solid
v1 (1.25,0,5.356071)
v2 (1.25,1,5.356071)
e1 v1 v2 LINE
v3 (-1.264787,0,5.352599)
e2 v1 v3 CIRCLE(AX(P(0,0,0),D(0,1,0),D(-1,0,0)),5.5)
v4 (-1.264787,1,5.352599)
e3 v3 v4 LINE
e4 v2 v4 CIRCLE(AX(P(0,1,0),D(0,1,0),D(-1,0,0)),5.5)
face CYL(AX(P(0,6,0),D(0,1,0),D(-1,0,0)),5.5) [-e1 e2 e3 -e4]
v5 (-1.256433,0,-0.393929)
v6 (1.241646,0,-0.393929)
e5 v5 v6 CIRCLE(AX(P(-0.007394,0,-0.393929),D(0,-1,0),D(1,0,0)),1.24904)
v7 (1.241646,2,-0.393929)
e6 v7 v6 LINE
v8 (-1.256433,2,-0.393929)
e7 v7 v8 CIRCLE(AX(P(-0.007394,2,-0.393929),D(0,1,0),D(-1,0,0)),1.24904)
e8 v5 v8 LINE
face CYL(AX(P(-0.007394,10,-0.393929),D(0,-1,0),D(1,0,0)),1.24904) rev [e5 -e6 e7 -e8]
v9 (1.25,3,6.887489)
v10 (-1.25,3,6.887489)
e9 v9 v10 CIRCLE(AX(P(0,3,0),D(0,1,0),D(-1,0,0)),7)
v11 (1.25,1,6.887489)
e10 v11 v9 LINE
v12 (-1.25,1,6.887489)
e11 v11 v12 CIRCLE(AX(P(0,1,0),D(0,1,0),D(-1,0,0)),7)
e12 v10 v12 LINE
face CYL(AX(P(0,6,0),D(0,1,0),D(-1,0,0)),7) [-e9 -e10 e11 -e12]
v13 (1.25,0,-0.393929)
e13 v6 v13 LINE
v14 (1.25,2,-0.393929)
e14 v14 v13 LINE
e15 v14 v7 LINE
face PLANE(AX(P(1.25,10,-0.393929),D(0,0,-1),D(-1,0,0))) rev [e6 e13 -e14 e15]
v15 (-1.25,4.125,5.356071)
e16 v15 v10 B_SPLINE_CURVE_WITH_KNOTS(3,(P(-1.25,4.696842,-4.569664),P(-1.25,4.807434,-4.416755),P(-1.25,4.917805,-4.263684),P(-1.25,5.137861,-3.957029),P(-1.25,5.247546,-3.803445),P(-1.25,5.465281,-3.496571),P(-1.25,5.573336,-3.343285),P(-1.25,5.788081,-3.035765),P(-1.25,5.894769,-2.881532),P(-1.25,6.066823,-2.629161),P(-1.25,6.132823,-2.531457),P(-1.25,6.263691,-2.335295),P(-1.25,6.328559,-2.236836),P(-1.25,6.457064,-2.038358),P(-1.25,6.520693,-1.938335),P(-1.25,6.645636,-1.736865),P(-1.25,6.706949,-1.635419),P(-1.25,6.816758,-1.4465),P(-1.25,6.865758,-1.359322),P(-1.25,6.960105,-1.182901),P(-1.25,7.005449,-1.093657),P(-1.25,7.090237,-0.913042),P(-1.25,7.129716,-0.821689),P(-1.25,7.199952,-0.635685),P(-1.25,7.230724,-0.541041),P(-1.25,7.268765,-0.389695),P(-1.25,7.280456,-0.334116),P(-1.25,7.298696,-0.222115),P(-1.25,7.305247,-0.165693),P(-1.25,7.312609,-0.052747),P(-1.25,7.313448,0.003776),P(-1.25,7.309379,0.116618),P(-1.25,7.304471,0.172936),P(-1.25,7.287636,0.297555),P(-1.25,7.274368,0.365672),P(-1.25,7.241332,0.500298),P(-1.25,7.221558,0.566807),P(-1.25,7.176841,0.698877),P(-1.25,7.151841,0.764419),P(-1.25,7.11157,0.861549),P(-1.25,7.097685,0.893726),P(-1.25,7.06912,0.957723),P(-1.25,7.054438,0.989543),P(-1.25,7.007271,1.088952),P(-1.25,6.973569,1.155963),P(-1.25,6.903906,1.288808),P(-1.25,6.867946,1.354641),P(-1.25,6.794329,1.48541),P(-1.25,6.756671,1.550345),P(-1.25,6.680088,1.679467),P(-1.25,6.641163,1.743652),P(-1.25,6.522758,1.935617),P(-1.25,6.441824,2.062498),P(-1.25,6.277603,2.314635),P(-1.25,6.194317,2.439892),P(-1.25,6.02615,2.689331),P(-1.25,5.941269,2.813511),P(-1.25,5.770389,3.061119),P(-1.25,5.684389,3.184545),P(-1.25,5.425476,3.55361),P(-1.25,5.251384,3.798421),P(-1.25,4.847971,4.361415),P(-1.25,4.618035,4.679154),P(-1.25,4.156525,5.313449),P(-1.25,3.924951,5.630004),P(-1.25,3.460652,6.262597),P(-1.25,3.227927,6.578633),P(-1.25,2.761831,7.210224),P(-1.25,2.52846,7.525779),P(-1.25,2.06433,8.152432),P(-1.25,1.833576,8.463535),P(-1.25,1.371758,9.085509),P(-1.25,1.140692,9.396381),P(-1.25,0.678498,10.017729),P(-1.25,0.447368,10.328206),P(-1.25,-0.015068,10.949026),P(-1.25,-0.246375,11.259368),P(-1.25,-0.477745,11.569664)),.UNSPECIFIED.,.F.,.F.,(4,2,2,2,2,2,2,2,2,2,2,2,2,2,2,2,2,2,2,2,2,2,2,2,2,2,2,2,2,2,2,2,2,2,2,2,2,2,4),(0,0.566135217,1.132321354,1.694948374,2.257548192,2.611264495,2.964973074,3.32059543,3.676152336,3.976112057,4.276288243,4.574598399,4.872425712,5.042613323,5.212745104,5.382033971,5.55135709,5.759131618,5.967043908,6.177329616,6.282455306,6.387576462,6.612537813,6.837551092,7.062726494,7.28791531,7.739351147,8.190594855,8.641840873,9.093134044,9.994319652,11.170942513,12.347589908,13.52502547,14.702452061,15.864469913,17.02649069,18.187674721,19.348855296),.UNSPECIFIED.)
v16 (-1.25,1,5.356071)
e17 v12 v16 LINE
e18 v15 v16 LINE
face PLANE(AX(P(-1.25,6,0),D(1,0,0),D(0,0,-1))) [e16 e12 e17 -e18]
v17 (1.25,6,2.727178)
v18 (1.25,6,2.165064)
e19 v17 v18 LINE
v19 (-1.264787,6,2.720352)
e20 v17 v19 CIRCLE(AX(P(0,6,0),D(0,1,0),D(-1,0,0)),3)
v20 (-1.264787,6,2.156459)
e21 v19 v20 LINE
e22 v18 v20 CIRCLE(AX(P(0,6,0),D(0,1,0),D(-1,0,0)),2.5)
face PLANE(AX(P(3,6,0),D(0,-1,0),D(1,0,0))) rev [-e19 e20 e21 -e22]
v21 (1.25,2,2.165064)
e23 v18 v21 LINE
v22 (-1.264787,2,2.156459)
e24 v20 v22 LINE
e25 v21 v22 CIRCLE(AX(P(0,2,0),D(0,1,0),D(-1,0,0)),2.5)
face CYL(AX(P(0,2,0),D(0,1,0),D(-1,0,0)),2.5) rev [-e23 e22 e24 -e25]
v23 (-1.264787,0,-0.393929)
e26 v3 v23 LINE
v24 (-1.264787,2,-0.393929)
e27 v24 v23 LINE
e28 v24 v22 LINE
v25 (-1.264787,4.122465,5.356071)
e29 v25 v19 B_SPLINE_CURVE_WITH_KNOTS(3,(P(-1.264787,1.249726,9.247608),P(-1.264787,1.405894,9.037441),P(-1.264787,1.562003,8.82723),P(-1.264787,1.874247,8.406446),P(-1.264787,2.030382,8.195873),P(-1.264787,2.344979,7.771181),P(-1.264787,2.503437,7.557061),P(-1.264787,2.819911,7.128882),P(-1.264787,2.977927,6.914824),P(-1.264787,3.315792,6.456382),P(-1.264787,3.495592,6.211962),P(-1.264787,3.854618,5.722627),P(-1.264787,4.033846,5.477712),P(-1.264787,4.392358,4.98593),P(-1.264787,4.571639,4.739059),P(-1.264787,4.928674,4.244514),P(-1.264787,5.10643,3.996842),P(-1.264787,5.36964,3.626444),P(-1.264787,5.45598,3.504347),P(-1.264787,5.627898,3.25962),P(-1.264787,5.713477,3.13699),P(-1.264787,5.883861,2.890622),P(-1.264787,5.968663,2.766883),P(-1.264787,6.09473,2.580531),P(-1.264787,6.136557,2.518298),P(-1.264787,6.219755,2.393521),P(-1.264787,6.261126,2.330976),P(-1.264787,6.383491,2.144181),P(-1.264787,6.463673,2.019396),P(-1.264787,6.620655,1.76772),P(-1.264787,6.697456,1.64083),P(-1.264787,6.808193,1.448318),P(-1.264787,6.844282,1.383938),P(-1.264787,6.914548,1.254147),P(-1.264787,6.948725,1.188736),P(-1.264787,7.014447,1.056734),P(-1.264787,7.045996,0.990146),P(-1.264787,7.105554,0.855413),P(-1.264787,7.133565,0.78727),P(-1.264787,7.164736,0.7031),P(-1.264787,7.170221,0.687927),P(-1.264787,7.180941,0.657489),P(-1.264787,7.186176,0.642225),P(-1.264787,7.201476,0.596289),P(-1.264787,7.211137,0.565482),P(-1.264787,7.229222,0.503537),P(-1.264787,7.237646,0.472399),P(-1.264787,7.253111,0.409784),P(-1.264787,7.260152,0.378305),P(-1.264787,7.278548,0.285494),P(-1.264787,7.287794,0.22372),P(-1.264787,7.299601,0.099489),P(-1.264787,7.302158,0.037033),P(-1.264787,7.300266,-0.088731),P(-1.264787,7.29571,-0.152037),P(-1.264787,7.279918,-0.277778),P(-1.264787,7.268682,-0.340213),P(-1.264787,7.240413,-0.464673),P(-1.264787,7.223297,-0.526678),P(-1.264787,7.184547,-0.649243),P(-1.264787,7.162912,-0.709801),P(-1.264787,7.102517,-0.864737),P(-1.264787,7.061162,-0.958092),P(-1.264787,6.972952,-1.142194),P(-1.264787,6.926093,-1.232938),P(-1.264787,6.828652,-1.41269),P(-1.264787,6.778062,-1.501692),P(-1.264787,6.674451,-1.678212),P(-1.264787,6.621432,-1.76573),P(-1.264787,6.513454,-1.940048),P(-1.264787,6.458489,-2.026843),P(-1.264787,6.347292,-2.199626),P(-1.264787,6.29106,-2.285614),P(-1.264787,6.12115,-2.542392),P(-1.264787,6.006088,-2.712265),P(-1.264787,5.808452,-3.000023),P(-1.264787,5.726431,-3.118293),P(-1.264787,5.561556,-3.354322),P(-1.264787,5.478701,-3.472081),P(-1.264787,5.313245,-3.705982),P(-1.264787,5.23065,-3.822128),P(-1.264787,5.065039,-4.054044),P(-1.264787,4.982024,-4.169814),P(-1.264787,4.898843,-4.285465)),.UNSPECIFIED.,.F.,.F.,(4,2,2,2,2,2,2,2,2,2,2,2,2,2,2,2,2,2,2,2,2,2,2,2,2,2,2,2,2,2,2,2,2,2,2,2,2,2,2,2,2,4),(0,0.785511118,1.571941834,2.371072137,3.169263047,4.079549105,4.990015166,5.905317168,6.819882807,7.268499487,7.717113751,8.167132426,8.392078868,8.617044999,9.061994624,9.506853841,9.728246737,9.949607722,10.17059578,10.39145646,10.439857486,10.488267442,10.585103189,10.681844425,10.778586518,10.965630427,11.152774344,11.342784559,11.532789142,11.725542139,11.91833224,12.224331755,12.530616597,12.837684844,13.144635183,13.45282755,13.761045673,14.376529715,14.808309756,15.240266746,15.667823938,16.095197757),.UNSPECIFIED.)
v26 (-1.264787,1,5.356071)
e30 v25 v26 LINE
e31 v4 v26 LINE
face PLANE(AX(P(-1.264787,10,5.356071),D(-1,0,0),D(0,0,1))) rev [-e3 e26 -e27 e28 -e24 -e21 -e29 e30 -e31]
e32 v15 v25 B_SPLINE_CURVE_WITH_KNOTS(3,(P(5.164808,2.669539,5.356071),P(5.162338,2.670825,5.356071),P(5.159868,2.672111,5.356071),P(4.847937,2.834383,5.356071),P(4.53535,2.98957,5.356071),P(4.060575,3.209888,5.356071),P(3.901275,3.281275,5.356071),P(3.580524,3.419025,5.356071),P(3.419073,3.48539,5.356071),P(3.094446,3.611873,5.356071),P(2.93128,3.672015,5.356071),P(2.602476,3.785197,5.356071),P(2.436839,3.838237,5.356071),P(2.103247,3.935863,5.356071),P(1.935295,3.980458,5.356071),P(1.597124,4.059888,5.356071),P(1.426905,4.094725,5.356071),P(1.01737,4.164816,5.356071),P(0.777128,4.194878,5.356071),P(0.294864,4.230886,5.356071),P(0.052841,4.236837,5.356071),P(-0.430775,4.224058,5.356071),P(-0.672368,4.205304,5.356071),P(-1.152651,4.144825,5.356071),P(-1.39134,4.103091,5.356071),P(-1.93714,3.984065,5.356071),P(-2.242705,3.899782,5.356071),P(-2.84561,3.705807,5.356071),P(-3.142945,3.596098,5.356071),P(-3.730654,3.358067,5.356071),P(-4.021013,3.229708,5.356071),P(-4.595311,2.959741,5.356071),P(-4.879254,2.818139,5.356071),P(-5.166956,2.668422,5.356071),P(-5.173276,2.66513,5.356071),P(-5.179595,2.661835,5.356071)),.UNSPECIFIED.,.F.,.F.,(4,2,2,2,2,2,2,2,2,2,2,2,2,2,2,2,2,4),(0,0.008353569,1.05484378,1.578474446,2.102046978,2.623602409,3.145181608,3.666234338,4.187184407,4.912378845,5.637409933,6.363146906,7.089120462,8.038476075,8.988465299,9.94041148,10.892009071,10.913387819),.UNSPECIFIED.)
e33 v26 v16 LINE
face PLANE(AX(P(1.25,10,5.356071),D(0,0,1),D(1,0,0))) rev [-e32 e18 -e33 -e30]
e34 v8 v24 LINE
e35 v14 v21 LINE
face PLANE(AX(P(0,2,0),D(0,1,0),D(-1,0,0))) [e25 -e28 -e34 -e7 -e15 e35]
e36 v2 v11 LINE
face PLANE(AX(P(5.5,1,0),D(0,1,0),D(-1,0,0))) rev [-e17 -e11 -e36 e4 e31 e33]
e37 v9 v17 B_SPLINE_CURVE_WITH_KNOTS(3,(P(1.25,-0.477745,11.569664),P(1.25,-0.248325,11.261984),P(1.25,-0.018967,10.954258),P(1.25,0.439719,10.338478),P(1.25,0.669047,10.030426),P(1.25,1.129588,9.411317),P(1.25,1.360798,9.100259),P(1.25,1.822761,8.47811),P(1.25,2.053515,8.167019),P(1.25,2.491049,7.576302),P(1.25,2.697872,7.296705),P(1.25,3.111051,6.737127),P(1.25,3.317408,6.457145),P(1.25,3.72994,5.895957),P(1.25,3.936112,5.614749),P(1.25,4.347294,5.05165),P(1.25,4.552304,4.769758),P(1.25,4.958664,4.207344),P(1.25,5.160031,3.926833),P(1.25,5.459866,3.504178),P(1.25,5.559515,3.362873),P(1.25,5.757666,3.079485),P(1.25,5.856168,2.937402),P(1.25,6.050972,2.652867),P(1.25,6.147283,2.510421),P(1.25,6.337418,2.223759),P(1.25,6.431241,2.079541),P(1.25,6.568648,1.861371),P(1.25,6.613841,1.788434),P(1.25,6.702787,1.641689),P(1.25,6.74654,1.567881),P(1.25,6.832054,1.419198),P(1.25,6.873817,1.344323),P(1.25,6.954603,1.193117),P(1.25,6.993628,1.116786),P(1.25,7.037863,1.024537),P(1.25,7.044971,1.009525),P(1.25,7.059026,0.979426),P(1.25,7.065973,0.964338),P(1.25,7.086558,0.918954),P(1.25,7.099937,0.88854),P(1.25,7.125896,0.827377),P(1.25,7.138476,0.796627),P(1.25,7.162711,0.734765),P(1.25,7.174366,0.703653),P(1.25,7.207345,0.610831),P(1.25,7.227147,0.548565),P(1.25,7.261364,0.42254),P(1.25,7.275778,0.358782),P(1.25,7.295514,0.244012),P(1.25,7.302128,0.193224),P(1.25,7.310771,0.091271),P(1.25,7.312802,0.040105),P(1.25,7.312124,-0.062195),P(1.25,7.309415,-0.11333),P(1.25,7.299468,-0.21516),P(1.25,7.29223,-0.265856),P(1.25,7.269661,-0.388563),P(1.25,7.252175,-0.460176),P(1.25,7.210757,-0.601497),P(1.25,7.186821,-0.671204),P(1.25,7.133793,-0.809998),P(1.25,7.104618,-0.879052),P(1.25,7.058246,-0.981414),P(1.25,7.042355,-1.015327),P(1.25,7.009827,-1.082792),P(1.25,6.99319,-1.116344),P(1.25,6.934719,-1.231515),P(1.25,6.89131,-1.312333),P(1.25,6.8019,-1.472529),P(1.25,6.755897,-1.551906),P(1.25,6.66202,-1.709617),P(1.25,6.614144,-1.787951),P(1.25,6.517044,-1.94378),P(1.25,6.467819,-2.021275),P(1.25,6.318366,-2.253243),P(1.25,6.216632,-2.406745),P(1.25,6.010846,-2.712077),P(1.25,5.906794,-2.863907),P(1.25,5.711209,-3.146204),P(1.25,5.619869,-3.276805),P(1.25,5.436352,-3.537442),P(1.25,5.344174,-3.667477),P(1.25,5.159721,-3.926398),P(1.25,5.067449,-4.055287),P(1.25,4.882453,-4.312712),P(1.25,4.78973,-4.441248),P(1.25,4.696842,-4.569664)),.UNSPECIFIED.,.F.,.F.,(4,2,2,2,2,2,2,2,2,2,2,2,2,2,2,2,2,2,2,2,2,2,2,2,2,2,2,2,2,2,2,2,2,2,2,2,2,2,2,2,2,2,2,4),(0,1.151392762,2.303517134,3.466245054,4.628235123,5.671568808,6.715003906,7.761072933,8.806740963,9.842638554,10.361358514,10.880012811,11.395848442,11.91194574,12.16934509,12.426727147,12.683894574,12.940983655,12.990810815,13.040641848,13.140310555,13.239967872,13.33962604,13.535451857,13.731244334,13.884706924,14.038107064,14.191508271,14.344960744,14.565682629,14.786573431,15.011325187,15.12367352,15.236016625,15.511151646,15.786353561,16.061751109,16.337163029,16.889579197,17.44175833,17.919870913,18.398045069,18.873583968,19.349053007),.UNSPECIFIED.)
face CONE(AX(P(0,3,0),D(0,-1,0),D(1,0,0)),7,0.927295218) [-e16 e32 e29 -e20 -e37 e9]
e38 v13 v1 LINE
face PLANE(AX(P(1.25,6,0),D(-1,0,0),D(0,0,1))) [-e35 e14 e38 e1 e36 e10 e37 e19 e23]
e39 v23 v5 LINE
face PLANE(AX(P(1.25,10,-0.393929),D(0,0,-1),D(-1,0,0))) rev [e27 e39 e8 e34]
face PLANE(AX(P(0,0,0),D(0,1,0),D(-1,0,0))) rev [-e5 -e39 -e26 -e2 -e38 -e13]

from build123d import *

# Parameters (mm, degrees)
SKETCH7_R               = 2.5
CUT_EXTRUDE2_DEPTH      = 4
CUT_EXTRUDE3_DEPTH      = 4
CUT_EXTRUDE3_DEPTH_BACK = 4
SKETCH8_W               = 2.5
SKETCH8_H               = 7.259020633
FILLET1_R               = 1.5
SKETCH9_W               = 2.5
SKETCH9_H               = 5.356071321
CUT_EXTRUDE4_DEPTH      = 10
FILLET2_R               = 1.25
SKETCH10_W              = 2.503236591
SKETCH10_H              = 5.356071321
CUT_EXTRUDE5_DEPTH      = 10
SKETCH11_W              = 2.503236591
SKETCH11_H              = 6.001405943
CUT_EXTRUDE6_DEPTH      = 10
FILLET4_R               = 1.25
SKETCH12_W              = 2.514787158
SKETCH12_H              = 5.75
CUT_EXTRUDE9_DEPTH      = 10
SKETCH14_R              = 1.249039751
CUT_EXTRUDE10_DEPTH     = 10


# Some blends are built 0.0001 mm under size
with BuildPart() as part:
    # Sketch5 → Revolve3 (revolve)
    with BuildSketch(Plane.XY, mode=Mode.PRIVATE) as revolve3_sk:
        Polygon((0, 0), (5.5, 0), (5.5, 1), (7, 1), (7, 3), (3, 6), (0, 6), align=None)
    revolve(revolve3_sk.sketch.rotate(Axis((0, 6, 0), (0, -1, 0)), 180), axis=Axis((0, 6, 0), (0, -1, 0)))

    # Sketch7 → Cut-Extrude2 (cut)
    with BuildSketch(Plane(origin=(0, 6, 0), x_dir=(1, 0, 0), z_dir=(0, 1, 0))):
        with Locations(Location((0, 0, 0), (0, 0, 180))):
            Circle(SKETCH7_R)
    extrude(amount=-CUT_EXTRUDE2_DEPTH, mode=Mode.SUBTRACT)

    # Sketch8 → Cut-Extrude3 (cut, two sides: drawn at the far end of the back side and taken through both)
    with BuildSketch(Plane(origin=(0, 2, 0), x_dir=(1, 0, 0), z_dir=(0, 1, 0)).offset(-CUT_EXTRUDE3_DEPTH_BACK)):
        with Locations((0, -3.629510317)):
            Rectangle(SKETCH8_W, SKETCH8_H)
    extrude(amount=CUT_EXTRUDE3_DEPTH + CUT_EXTRUDE3_DEPTH_BACK, mode=Mode.SUBTRACT)

    # Fillet1
    # the kernel refuses this fillet: 1.5 mm, written as the material it adds along each edge
    with BuildSketch(Plane(origin=(1.25, 2, 0), x_dir=(-1, 0, 0), z_dir=(0, -1, 0)), Plane(origin=(-1.25, 0, 0), x_dir=(1, 0, 0), z_dir=(0, 1, 0))) as fillet1_piece_1:
        with BuildLine():
            CenterArc((FILLET1_R, -FILLET1_R), FILLET1_R, 90, 90)
            Line((0, -FILLET1_R), (0, 0))
            Line((0, 0), (FILLET1_R, 0))
        make_face()
    extrude(amount=2)

    # Sketch9 → Cut-Extrude4 (cut)
    with BuildSketch(Plane(origin=(0, 0, 0), x_dir=(-1, 0, 0), z_dir=(0, -1, 0))):
        with Locations((0, -2.67803566)):
            Rectangle(SKETCH9_W, SKETCH9_H)
    extrude(amount=-CUT_EXTRUDE4_DEPTH, mode=Mode.SUBTRACT)

    # Fillet2
    fillet2_edges = [part.edges().sort_by_distance(p)[0] for p in [
        (-1.25, 1, 0),
        (1.25, 1, 0),
    ]]
    fillet(fillet2_edges, radius=FILLET2_R - 0.0001)  # a hair under: the kernel refuses the full size

    # Sketch10 → Cut-Extrude5 (cut)
    with BuildSketch(Plane.XZ):
        with Locations((-0.001618296, 2.67803566)):
            Rectangle(SKETCH10_W, SKETCH10_H)
    extrude(amount=-CUT_EXTRUDE5_DEPTH, mode=Mode.SUBTRACT)

    # Sketch11 → Cut-Extrude6 (cut)
    with BuildSketch(Plane(origin=(0, 0, 0), x_dir=(-1, 0, 0), z_dir=(0, -1, 0))):
        with Locations((0.001618296, -2.355368349)):
            Rectangle(SKETCH11_W, SKETCH11_H)
    extrude(amount=-CUT_EXTRUDE6_DEPTH, mode=Mode.SUBTRACT)

    # Fillet4
    fillet4_edges = [part.edges().sort_by_distance(p)[0] for p in [
        (1.25, 1, -0.645334622),
        (-1.253236591, 1, -0.645334622),
    ]]
    fillet(fillet4_edges, radius=FILLET4_R)

    # Sketch12 → Cut-Extrude9 (cut)
    with BuildSketch(Plane.XZ):
        with Locations((-0.007393579, 2.481071321)):
            Rectangle(SKETCH12_W, SKETCH12_H)
    extrude(amount=-CUT_EXTRUDE9_DEPTH, mode=Mode.SUBTRACT)

    # Sketch14 → Cut-Extrude10 (cut)
    with BuildSketch(Plane(origin=(0, 0, 0), x_dir=(-1, 0, 0), z_dir=(0, -1, 0))):
        with Locations((0.007393579, 0.393928679)):
            Circle(SKETCH14_R)
    extrude(amount=-CUT_EXTRUDE10_DEPTH, mode=Mode.SUBTRACT)


solid = part.part
